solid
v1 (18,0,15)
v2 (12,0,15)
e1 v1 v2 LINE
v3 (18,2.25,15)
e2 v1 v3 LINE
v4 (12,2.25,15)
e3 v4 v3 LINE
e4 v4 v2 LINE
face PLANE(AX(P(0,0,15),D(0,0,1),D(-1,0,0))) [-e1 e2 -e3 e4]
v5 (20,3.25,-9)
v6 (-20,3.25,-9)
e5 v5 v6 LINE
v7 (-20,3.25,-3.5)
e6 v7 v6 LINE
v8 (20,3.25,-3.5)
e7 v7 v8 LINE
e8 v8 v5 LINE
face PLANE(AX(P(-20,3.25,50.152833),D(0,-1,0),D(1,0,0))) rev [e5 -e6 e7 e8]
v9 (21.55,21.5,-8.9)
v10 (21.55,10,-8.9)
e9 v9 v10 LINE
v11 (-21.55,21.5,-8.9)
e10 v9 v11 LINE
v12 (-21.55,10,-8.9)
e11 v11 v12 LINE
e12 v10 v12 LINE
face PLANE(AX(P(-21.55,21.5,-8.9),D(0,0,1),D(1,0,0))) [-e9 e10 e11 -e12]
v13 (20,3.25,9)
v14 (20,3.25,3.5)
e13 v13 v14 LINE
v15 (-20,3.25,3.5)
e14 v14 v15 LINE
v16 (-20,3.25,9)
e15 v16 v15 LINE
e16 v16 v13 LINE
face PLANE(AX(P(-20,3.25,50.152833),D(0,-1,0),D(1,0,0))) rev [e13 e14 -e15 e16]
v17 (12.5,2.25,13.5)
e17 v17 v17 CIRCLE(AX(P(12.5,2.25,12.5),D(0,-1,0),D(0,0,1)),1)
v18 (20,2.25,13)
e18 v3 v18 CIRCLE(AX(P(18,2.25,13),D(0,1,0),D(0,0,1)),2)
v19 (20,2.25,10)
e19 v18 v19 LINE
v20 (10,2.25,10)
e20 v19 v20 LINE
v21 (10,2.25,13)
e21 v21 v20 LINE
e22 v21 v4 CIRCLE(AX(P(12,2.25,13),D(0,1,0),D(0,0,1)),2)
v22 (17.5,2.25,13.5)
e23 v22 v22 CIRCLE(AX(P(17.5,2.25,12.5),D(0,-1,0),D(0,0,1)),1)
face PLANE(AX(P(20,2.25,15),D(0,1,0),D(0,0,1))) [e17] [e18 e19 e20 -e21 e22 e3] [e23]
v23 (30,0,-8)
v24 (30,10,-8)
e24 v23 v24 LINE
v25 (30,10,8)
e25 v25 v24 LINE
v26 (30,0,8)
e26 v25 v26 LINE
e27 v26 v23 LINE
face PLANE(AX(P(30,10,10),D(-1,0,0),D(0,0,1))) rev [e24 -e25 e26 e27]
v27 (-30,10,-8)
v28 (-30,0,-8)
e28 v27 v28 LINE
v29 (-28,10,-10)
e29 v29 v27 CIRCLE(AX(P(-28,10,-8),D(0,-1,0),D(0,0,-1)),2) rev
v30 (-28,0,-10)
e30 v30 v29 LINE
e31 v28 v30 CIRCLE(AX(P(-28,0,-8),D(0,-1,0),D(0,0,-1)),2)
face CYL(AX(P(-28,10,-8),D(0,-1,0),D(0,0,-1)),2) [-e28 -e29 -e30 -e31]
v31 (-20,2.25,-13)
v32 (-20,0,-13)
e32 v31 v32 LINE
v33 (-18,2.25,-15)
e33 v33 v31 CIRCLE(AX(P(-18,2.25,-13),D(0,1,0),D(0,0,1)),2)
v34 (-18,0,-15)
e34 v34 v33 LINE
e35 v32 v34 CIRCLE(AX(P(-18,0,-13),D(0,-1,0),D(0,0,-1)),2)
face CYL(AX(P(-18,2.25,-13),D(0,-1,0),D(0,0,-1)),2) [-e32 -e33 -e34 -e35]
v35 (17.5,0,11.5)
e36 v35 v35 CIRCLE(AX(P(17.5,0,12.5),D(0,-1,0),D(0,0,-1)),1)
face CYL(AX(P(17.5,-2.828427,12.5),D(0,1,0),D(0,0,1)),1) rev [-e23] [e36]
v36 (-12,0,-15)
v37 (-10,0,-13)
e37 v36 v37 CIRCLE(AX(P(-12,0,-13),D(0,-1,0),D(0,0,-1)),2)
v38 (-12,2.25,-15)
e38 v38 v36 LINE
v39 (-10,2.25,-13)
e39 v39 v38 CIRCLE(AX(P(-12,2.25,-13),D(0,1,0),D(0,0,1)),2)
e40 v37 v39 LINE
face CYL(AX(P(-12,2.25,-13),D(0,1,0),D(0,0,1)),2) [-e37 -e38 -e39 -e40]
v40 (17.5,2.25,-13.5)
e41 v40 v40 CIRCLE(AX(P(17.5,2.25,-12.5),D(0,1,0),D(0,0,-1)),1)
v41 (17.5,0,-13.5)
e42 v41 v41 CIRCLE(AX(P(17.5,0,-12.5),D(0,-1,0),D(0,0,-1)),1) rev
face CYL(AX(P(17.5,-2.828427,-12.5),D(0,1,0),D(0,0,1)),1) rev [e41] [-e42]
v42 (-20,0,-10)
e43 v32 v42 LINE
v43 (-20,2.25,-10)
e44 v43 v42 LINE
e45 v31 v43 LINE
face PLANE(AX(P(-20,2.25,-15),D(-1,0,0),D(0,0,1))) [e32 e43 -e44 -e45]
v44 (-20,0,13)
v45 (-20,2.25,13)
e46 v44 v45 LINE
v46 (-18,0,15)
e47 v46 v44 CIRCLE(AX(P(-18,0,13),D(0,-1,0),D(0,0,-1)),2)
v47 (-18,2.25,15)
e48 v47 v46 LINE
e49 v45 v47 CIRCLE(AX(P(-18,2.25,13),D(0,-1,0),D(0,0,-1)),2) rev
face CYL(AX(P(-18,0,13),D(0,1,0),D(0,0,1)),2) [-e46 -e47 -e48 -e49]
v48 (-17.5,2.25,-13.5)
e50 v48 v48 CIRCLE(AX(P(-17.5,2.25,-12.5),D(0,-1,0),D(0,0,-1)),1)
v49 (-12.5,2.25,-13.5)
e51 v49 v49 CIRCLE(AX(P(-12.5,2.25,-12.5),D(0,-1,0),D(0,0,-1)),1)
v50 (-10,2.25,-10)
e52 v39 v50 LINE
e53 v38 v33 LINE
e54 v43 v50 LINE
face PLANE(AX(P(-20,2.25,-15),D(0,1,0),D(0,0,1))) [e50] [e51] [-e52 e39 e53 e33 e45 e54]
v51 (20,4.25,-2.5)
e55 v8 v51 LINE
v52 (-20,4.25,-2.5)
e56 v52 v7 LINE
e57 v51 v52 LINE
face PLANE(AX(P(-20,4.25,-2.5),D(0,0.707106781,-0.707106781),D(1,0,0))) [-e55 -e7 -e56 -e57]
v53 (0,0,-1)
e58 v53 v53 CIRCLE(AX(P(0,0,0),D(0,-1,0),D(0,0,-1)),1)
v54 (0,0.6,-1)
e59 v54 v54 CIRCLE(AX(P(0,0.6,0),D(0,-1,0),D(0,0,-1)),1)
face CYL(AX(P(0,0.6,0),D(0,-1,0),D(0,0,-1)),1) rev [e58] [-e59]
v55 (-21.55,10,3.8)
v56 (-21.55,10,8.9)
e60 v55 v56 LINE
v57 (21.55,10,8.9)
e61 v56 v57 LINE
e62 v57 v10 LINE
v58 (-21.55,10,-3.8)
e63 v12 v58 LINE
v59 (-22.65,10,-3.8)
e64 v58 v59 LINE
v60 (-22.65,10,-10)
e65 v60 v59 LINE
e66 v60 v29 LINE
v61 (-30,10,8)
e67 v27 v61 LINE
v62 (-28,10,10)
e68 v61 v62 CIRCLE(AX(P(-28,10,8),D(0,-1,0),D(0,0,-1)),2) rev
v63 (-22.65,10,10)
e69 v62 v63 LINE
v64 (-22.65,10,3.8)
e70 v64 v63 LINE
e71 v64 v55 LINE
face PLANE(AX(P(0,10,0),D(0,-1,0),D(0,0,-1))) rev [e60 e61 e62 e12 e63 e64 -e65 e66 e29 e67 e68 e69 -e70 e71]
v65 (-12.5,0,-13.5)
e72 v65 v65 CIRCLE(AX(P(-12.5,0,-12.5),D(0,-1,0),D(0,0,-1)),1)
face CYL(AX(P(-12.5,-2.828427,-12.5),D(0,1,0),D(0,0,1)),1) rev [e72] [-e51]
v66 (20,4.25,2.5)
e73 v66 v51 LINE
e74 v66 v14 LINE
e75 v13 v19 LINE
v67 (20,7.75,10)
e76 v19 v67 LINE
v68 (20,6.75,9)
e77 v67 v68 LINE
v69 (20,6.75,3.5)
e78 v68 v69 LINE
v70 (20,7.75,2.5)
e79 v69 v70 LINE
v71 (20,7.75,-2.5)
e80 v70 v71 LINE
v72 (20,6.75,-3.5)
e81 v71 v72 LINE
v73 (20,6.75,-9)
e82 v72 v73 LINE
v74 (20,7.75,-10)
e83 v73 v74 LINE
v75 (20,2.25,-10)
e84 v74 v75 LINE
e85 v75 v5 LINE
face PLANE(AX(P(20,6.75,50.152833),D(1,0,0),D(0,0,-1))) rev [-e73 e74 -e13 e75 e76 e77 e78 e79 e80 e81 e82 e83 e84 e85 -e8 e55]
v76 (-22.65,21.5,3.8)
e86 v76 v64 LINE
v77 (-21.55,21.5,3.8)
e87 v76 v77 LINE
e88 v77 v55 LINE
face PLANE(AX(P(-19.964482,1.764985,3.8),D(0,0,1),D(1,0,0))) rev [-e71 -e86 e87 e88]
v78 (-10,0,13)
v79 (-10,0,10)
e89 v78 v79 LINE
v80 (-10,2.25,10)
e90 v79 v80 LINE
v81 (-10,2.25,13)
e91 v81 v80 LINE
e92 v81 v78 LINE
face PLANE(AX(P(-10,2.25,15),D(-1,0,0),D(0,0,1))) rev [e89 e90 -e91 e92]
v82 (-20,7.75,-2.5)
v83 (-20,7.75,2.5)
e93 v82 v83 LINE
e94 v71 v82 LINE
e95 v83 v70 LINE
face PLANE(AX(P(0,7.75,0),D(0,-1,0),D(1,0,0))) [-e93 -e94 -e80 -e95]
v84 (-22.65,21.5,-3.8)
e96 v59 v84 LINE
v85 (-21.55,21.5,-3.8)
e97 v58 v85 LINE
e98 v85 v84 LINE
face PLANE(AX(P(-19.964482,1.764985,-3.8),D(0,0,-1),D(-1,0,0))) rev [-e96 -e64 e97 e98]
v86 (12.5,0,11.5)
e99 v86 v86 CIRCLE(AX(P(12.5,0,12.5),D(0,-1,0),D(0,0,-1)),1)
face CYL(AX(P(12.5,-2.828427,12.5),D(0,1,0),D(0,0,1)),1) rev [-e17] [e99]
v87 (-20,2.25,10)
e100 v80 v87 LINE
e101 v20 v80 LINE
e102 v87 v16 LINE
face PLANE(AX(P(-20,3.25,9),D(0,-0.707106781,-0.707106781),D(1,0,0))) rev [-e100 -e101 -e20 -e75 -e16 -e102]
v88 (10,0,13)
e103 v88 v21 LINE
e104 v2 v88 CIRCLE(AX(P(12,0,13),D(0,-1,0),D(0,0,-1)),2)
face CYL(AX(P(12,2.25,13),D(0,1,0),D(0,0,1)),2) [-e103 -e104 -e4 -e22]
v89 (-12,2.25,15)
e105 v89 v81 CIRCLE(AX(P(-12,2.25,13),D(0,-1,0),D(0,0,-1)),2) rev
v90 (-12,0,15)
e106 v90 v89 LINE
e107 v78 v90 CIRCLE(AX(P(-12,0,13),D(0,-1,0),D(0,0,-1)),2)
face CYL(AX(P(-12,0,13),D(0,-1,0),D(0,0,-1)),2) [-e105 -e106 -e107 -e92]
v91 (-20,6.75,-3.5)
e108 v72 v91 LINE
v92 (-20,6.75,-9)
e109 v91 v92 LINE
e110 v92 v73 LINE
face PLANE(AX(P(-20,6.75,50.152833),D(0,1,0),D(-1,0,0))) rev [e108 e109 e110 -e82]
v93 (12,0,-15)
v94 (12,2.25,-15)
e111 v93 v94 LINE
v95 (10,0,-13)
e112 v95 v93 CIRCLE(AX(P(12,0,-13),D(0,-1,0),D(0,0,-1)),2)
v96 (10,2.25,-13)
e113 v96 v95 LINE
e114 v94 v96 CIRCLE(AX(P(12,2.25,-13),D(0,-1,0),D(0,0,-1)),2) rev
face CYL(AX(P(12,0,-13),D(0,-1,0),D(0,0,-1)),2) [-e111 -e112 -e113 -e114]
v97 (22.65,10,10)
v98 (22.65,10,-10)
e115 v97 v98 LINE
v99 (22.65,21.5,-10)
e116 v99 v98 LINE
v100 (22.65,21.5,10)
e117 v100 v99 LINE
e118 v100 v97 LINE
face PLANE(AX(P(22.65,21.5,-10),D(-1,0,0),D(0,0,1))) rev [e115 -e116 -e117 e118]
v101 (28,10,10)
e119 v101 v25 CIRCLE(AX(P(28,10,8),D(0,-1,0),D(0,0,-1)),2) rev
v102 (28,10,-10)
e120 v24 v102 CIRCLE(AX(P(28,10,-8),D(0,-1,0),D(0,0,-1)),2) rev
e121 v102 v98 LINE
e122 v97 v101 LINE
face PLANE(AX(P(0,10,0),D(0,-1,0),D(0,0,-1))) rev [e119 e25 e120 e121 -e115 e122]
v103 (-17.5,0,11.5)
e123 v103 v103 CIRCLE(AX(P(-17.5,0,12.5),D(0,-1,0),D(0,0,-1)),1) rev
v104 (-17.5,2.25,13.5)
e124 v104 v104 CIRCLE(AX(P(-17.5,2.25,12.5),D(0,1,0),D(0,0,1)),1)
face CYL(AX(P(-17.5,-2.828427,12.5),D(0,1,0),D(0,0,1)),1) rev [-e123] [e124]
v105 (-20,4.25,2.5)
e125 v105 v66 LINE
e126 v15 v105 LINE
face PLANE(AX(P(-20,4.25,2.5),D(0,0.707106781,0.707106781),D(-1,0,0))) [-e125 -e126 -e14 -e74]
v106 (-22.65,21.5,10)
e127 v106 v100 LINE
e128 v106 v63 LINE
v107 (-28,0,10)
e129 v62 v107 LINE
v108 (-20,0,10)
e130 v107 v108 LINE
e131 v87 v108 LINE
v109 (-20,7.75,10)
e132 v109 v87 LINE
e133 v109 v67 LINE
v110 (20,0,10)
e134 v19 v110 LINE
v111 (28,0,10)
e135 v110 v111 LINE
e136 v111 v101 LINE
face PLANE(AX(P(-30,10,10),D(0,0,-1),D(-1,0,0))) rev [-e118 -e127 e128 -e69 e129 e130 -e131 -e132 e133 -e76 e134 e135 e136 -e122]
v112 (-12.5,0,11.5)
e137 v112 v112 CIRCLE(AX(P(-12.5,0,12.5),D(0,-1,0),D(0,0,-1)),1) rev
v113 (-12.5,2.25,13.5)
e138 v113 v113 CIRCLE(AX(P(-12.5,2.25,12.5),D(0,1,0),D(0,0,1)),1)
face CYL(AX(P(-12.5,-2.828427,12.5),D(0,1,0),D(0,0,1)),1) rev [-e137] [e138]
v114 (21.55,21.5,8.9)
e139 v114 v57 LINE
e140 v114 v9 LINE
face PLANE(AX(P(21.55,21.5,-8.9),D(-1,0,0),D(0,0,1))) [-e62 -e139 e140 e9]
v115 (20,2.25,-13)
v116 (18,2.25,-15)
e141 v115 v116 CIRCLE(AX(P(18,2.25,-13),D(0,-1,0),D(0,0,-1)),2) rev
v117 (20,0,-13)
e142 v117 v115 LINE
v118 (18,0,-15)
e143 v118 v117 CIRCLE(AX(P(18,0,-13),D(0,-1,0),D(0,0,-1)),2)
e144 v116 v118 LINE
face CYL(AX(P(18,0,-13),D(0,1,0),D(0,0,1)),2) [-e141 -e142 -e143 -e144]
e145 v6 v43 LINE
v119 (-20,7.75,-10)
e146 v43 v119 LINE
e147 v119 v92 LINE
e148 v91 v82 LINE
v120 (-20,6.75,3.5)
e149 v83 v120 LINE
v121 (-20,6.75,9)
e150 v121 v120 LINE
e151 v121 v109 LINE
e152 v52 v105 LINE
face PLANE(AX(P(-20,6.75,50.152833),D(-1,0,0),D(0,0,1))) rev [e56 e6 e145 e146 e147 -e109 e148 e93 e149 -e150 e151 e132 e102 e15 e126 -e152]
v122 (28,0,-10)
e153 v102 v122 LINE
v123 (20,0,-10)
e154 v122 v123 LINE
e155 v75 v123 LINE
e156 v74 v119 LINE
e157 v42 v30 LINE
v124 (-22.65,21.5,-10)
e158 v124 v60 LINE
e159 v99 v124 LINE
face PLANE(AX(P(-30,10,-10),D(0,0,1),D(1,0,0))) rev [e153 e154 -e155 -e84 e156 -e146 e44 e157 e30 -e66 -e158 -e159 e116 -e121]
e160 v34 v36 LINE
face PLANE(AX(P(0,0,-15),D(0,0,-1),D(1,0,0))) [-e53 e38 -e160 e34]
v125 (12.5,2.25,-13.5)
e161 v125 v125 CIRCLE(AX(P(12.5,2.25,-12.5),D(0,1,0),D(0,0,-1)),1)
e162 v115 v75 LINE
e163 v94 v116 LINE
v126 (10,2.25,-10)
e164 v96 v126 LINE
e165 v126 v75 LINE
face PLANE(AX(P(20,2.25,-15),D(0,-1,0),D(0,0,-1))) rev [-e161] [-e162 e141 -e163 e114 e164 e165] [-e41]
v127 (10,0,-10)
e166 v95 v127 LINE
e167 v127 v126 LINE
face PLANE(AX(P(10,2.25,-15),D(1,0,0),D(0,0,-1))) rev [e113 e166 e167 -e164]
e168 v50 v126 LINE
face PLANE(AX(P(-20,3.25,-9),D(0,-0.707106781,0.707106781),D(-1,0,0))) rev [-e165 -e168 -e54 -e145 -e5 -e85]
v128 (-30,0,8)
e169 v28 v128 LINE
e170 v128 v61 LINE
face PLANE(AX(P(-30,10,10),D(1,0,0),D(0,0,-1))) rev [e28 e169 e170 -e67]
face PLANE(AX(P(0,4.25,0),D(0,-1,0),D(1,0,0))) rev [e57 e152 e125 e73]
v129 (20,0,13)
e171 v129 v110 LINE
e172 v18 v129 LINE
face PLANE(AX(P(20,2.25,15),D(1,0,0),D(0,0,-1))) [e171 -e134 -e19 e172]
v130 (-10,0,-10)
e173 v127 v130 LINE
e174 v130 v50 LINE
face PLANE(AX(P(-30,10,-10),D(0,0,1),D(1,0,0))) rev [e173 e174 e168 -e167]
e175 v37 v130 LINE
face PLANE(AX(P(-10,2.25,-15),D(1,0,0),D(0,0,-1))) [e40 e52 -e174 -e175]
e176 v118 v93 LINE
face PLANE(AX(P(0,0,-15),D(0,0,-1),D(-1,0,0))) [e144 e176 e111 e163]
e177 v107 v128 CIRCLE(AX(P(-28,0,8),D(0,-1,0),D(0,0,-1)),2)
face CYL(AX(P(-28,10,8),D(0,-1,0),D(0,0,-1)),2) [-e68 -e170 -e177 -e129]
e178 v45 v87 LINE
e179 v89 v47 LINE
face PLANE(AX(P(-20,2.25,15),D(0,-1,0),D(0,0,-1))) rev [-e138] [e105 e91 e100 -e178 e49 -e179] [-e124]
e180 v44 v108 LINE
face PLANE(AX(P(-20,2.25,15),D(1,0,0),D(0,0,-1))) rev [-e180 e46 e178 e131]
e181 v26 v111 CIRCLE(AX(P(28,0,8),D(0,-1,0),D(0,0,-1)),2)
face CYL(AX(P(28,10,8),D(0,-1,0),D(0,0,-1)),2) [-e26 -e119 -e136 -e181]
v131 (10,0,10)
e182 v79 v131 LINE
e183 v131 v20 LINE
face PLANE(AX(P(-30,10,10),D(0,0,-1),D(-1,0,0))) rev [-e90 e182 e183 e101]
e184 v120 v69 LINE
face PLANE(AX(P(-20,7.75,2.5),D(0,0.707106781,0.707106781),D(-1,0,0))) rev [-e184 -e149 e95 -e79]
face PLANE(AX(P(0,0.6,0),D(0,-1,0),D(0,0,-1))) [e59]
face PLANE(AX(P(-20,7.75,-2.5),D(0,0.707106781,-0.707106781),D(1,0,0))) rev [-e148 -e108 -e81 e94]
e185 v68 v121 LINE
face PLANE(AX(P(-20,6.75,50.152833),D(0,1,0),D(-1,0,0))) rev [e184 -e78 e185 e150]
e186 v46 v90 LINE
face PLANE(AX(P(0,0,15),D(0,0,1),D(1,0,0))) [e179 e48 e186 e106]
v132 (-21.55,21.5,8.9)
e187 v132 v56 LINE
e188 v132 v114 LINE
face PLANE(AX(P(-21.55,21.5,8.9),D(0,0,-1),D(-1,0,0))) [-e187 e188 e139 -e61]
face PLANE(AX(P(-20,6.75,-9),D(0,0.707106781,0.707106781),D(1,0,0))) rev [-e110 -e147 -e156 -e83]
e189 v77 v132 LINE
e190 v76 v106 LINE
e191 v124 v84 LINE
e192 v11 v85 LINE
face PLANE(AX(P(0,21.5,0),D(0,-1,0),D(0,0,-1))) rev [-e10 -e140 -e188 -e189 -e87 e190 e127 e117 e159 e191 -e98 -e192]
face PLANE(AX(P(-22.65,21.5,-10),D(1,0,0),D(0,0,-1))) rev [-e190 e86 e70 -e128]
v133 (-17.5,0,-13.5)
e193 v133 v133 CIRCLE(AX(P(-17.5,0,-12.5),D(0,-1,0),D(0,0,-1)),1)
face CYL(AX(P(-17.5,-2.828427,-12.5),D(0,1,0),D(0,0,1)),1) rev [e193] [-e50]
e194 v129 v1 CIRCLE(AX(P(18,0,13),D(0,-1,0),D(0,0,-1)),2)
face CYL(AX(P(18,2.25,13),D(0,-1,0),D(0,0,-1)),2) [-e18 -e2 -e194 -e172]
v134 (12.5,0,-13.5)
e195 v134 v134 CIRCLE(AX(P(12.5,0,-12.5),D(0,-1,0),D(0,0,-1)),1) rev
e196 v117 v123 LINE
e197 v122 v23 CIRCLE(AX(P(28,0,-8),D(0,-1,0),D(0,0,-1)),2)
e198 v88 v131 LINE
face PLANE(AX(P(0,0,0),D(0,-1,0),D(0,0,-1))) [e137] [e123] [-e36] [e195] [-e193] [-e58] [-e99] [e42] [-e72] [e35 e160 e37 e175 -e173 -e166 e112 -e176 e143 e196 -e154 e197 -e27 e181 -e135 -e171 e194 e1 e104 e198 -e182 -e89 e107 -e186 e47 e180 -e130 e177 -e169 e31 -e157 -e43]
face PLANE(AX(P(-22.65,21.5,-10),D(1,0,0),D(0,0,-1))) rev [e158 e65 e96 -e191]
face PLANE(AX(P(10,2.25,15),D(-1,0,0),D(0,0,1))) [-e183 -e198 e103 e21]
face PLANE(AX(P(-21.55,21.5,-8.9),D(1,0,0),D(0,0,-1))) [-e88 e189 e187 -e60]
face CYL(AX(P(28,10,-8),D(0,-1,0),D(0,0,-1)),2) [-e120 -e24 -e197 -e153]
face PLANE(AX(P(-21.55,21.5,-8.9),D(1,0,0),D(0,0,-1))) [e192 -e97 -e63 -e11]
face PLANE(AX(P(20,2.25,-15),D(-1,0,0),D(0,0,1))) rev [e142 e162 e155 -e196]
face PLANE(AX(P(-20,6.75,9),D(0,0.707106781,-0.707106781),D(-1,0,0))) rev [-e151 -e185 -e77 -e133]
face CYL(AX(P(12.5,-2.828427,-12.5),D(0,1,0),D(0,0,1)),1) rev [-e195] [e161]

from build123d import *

# Parameters (mm, degrees)
SKETCH1_W            = 60
SKETCH1_H            = 20
BASE_DEPTH           = 10
SKETCH5_W            = 40
SKETCH5_H            = 3.5
CUT_EXTRUDE3_DEPTH   = 20
SKETCH6_W            = 40
SKETCH6_H            = 5
BOSS_EXTRUDE4_DEPTH  = 1
SKETCH8_W            = 40
SKETCH8_H            = 5
CUT_EXTRUDE6_DEPTH   = 1
CHAMFER2_SIZE        = 1
SKETCH13_W           = 45.3
SKETCH13_H           = 20
SKETCH13_W_2         = 43.1
SKETCH13_H_2         = 17.8
BOSS_EXTRUDE5_DEPTH  = 11.5
SKETCH14_W           = 3.171036328
SKETCH14_H           = 7.6
CUT_EXTRUDE11_DEPTH  = 11.5
FILLET2_R            = 2
SKETCH17_W           = 10
SKETCH17_H           = 2.25
BOSS_EXTRUDE7_DEPTH  = 5
SKETCH18_R           = 1
CUT_EXTRUDE12_DEPTH  = 2.25
FILLET3_R            = 2
FILLET3_OF_MIRROR6_R = 2
MIRROR7_OUTLINE_R    = 1
MIRROR7_DEPTH        = 2.25
SKETCH19_R           = 1
CUT_EXTRUDE13_DEPTH  = 0.6


# Read off the part's stored shape, not the designer's step: Mirror7
with BuildPart() as part:
    # Sketch1 → Base (new body)
    with BuildSketch(Plane(origin=(0, 0, 0), x_dir=(1, 0, 0), z_dir=(0, 1, 0))):
        Rectangle(SKETCH1_W, SKETCH1_H)
    extrude(amount=BASE_DEPTH)

    # Sketch5 → Cut-Extrude3 (cut)
    with BuildSketch(Plane(origin=(0, 0, -10), x_dir=(-1, 0, 0), z_dir=(0, 0, -1))):
        with Locations((0, 5)):
            Rectangle(SKETCH5_W, SKETCH5_H)
    extrude(amount=-CUT_EXTRUDE3_DEPTH, mode=Mode.SUBTRACT)

    # Sketch6 → Boss-Extrude4 (add)
    with BuildSketch(Plane(origin=(0, 3.25, 0), x_dir=(1, 0, 0), z_dir=(0, 1, 0))):
        Rectangle(SKETCH6_W, SKETCH6_H)
    extrude(amount=BOSS_EXTRUDE4_DEPTH)

    # Sketch8 → Cut-Extrude6 (cut)
    with BuildSketch(Plane.XZ.offset(-6.75)):
        Rectangle(SKETCH8_W, SKETCH8_H)
    extrude(amount=-CUT_EXTRUDE6_DEPTH, mode=Mode.SUBTRACT)

    # Chamfer2
    chamfer2_edges = [part.edges().sort_by_distance(p)[0] for p in [
        (0, 6.75, -2.5),
        (0, 6.75, 10),
        (0, 3.25, -2.5),
        (0, 3.25, 2.5),
        (0, 3.25, -10),
        (0, 6.75, -10),
        (0, 3.25, 10),
        (0, 6.75, 2.5),
    ]]
    chamfer(chamfer2_edges, length=CHAMFER2_SIZE - 0.0001)  # a hair under: the kernel refuses the full size

    # Sketch13 → Boss-Extrude5 (add)
    with BuildSketch(Plane(origin=(0, 10, 0), x_dir=(1, 0, 0), z_dir=(0, 1, 0))):
        Rectangle(SKETCH13_W, SKETCH13_H)
        Rectangle(SKETCH13_W_2, SKETCH13_H_2, mode=Mode.SUBTRACT)
    extrude(amount=BOSS_EXTRUDE5_DEPTH)

    # Sketch14 → Cut-Extrude11 (cut)
    with BuildSketch(Plane(origin=(0, 21.5, 0), x_dir=(1, 0, 0), z_dir=(0, 1, 0))):
        with Locations((-21.55, 0)):
            Rectangle(SKETCH14_W, SKETCH14_H)
    extrude(amount=-CUT_EXTRUDE11_DEPTH, mode=Mode.SUBTRACT)

    # Fillet2
    fillet2_edges = [part.edges().sort_by_distance(p)[0] for p in [
        (30, 5, 10),
        (-30, 5, 10),
        (-30, 5, -10),
        (30, 5, -10),
    ]]
    fillet(fillet2_edges, radius=FILLET2_R)

    # Sketch17 → Boss-Extrude7 (add)
    with BuildSketch(Plane.XY.offset(10)):
        with Locations((-15, 1.125)):
            Rectangle(SKETCH17_W, SKETCH17_H)
    boss_extrude7 = extrude(amount=BOSS_EXTRUDE7_DEPTH)

    # Sketch18 → Cut-Extrude12 (cut)
    with BuildSketch(Plane(origin=(0, 2.25, 0), x_dir=(1, 0, 0), z_dir=(0, 1, 0))):
        with Locations(Location((-17.5, -12.5, 0), (0, 0, 270))):
            Circle(SKETCH18_R)
        with Locations(Location((-12.5, -12.5, 0), (0, 0, 270))):
            Circle(SKETCH18_R)
    cut_extrude12 = extrude(amount=-CUT_EXTRUDE12_DEPTH, mode=Mode.SUBTRACT)

    # Fillet3
    fillet3_edges = [part.edges().sort_by_distance(p)[0] for p in [
        (-20, 1.125, 15),
        (-10, 1.125, 15),
    ]]
    fillet(fillet3_edges, radius=FILLET3_R)

    # Mirror6: Boss-Extrude7, Cut-Extrude12 across plane
    add(boss_extrude7.mirror(Plane(origin=(0, 0, 0), x_dir=(0, 0, 1), z_dir=(1, 0, 0))))
    add(cut_extrude12.mirror(Plane(origin=(0, 0, 0), x_dir=(0, 0, 1), z_dir=(1, 0, 0))), mode=Mode.SUBTRACT)

    # Fillet3 of Mirror6
    fillet3_of_mirror6_edges = [part.edges().sort_by_distance(p)[0] for p in [
        (20, 1.125, 15),
        (10, 1.125, 15),
    ]]
    fillet(fillet3_of_mirror6_edges, radius=FILLET3_OF_MIRROR6_R)

    # Mirror7 outline → Mirror7 (add)
    # profile 1 of 2: a face of its own
    with BuildSketch(Plane(origin=(0, 0, 0), x_dir=(1, 0, 0), z_dir=(0, 1, 0))):
        with BuildLine():
            ThreePointArc((-18, 15), (-19.414213562, 14.414213562), (-20, 13))
            Line((-20, 13), (-20, 10))
            Line((-20, 10), (-10, 10))
            Line((-10, 10), (-10, 13))
            ThreePointArc((-10, 13), (-10.585786438, 14.414213562), (-12, 15))
            Line((-12, 15), (-18, 15))
        make_face()
        with Locations((-17.5, 12.5)):
            Circle(MIRROR7_OUTLINE_R, mode=Mode.SUBTRACT)
        with Locations((-12.5, 12.5)):
            Circle(MIRROR7_OUTLINE_R, mode=Mode.SUBTRACT)
    # profile 2 of 2: a face of its own
    with BuildSketch(Plane(origin=(0, 0, 0), x_dir=(1, 0, 0), z_dir=(0, 1, 0))):
        with BuildLine():
            Line((10, 13), (10, 10))
            Line((10, 10), (20, 10))
            Line((20, 10), (20, 13))
            ThreePointArc((20, 13), (19.414213562, 14.414213562), (18, 15))
            Line((18, 15), (12, 15))
            ThreePointArc((12, 15), (10.585786438, 14.414213562), (10, 13))
        make_face()
        with Locations((12.5, 12.5)):
            Circle(MIRROR7_OUTLINE_R, mode=Mode.SUBTRACT)
        with Locations((17.5, 12.5)):
            Circle(MIRROR7_OUTLINE_R, mode=Mode.SUBTRACT)
    extrude(amount=MIRROR7_DEPTH)

    # Sketch19 → Cut-Extrude13 (cut)
    with BuildSketch(Plane.XZ):
        with Locations(Location((0, 0, 0), (0, 0, 270))):
            Circle(SKETCH19_R)
    extrude(amount=-CUT_EXTRUDE13_DEPTH, mode=Mode.SUBTRACT)


solid = part.part
